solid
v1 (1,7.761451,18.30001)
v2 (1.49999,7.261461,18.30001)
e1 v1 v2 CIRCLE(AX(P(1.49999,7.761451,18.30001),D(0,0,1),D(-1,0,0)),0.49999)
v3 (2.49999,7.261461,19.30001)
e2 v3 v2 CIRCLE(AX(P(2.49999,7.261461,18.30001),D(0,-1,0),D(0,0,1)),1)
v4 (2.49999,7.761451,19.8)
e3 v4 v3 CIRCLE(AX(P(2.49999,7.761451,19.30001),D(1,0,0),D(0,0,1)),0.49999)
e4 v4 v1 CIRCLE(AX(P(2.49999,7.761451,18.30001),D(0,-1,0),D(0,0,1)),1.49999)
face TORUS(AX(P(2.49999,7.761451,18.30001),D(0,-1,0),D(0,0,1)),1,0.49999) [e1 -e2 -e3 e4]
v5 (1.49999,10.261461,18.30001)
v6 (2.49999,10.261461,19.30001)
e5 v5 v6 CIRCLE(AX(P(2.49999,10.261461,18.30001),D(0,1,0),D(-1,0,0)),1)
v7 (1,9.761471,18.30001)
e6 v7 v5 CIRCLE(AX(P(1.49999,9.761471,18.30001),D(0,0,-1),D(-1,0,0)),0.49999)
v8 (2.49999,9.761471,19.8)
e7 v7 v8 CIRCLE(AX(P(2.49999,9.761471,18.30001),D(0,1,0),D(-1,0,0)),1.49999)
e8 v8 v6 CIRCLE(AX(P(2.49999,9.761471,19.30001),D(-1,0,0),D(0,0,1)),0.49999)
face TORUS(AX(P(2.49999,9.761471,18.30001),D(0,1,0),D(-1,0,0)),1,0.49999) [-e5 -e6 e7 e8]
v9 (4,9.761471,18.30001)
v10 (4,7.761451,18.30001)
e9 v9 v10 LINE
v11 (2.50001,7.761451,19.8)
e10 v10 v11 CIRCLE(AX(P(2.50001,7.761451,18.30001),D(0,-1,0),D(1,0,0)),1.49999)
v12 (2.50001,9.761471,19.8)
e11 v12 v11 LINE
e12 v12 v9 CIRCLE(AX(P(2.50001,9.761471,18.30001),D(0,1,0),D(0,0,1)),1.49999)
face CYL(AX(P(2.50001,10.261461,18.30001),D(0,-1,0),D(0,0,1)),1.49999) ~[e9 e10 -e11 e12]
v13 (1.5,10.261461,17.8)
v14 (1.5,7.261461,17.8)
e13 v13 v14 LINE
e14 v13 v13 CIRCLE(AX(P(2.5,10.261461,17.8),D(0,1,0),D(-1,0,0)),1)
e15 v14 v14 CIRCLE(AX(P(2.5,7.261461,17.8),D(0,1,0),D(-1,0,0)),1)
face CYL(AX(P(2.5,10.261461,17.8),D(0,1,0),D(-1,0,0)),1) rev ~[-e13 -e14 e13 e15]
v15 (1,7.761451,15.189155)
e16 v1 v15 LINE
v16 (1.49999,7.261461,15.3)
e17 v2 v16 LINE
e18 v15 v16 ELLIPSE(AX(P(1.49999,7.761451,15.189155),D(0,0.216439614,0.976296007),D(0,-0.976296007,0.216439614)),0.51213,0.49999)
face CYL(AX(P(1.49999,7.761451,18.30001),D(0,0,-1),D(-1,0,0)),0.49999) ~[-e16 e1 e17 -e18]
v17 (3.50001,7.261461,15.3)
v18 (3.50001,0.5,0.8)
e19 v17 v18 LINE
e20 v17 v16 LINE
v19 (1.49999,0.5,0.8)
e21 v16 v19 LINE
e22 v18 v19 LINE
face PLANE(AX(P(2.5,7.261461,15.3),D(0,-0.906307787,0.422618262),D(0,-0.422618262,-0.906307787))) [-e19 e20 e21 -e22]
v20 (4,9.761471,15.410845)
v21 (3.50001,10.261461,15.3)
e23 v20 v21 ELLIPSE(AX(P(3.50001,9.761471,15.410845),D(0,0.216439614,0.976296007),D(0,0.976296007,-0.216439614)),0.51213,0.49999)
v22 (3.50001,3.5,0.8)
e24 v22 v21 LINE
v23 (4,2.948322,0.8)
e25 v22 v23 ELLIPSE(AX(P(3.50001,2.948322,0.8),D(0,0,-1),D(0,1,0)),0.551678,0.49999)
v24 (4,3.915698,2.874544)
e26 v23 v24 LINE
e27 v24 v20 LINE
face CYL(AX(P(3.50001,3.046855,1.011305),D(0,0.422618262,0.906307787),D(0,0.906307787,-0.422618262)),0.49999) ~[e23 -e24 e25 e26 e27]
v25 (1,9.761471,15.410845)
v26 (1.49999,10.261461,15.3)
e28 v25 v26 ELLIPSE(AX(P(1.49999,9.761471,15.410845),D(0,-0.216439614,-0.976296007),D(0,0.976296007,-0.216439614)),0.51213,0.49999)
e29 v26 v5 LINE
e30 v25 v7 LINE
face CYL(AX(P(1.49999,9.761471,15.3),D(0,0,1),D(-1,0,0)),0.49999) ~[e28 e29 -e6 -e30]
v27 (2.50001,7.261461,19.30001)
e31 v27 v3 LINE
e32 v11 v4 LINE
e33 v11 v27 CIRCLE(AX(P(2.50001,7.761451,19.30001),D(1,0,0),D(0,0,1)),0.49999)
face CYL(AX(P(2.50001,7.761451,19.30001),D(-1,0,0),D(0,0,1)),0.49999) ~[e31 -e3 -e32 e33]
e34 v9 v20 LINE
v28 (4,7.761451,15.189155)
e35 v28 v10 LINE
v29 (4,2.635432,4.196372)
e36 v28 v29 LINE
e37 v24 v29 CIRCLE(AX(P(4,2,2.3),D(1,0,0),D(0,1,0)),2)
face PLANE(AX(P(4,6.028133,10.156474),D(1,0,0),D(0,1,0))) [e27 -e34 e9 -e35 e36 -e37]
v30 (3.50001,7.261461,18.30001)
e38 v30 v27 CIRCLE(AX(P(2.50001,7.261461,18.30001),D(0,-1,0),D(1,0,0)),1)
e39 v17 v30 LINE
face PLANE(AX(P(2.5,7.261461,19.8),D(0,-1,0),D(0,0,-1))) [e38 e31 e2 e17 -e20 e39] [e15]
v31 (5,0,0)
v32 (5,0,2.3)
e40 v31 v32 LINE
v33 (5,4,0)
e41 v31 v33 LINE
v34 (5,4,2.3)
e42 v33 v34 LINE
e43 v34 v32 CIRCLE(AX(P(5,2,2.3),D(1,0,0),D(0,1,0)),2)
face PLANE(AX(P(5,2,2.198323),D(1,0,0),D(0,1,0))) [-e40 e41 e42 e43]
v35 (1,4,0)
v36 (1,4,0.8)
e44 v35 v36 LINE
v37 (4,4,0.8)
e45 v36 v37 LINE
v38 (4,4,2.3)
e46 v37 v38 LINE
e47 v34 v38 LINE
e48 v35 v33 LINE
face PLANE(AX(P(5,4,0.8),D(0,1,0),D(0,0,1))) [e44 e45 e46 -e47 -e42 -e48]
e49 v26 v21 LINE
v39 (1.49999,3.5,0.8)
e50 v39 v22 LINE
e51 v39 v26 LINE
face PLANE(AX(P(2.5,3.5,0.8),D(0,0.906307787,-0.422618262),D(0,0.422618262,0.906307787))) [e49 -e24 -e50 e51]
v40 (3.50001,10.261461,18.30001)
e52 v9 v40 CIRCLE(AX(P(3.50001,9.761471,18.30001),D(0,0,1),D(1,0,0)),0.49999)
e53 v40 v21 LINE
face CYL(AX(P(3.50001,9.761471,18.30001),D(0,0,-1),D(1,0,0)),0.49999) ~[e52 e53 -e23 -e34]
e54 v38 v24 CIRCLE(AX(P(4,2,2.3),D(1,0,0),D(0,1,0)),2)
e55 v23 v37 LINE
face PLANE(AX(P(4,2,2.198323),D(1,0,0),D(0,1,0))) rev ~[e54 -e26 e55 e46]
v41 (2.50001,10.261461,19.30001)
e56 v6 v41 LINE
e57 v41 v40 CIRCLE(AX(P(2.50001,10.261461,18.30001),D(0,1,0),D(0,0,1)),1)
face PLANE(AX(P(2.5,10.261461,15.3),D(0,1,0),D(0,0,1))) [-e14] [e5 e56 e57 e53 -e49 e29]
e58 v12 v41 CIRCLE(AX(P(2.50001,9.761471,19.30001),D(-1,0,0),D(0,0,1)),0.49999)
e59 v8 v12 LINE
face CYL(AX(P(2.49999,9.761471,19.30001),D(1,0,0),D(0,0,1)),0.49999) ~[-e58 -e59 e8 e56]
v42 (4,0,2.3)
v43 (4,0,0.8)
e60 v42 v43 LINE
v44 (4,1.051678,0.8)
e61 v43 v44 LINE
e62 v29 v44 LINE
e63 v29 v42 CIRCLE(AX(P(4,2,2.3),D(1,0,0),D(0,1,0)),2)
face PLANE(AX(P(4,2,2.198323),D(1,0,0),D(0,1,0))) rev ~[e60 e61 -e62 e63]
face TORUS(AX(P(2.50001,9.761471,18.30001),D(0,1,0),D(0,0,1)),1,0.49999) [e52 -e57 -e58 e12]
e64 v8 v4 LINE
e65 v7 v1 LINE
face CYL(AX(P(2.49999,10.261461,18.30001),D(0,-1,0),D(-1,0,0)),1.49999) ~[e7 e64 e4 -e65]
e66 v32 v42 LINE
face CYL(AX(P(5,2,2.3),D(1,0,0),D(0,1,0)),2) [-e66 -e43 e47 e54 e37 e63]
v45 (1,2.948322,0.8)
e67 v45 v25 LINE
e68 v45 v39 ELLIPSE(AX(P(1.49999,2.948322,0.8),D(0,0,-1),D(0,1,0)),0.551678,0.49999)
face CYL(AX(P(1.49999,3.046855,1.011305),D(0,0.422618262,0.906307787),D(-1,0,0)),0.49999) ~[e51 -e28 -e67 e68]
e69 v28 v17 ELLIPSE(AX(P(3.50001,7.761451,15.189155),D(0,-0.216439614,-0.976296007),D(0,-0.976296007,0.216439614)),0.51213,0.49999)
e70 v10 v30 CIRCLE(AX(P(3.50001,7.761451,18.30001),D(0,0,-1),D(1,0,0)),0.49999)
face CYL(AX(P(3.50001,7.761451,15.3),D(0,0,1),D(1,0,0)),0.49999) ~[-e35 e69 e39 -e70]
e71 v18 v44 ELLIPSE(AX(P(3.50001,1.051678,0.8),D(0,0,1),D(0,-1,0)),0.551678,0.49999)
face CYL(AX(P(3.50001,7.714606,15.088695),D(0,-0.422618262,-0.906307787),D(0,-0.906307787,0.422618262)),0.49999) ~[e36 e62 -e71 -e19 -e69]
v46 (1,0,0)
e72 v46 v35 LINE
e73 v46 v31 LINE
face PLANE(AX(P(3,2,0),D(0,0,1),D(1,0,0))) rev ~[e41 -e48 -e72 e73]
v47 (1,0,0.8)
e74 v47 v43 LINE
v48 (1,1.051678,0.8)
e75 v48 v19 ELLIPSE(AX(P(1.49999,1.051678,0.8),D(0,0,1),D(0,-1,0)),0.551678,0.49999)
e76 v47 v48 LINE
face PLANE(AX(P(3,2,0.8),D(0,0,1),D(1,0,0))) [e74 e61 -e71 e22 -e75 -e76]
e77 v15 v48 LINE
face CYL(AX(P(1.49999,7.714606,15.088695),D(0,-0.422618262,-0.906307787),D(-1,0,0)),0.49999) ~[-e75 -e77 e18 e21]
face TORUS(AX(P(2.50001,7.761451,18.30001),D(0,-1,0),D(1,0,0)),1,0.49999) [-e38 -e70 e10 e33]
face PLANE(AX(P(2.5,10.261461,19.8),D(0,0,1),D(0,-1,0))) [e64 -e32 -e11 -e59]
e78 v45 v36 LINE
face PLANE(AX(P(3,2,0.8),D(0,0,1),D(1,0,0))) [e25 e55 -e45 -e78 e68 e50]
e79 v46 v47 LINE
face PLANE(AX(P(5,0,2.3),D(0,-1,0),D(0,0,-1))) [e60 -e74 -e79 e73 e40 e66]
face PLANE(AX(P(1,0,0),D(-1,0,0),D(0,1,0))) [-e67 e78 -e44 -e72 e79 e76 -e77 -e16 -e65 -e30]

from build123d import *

# Parameters (mm, degrees)
F0_W      = 4
F0_H      = 4
F1_DEPTH  = 0.8
F4_DEPTH  = 1.5
F5_R      = 1
F6_DEPTH  = 10.2624610432
F7_R      = 1.49999
F8_R      = 0.49999
F10_DEPTH = 1


# Not quite as in the source:
# - a fillet or chamfer is up to 0.001 mm smaller than in the source, because OpenCascade refuses the exact size


with BuildPart() as f1:
    # F0 (on Top) → F1 (new body)
    with BuildSketch(Plane.XY):
        with Locations((3, 2)):
            Rectangle(F0_W, F0_H)
    extrude(amount=F1_DEPTH)

    # F3 (on offset) → F4 (join, symmetric)
    with BuildSketch(Plane.YZ.offset(2.5)):
        Polygon((0.5, 0.8), (3.5, 0.8), (10.2614610432, 15.3), (10.2614610432, 19.8), (7.2614610432, 19.8), (7.2614610432, 15.3), align=None)
    extrude(amount=F4_DEPTH, both=True)

    # F5 (on face) → F6 (cut, through all)
    with BuildSketch(Plane(origin=(0, 10.2614610432, 0), x_dir=(-1, 0, 0), z_dir=(0, 1, 0))):
        with Locations((-2.5, 17.8)):
            Circle(F5_R)
    extrude(amount=-F6_DEPTH, mode=Mode.SUBTRACT)

    # F7 (radius 1.5 in the source; OpenCascade refuses exactly that, so slightly less here)
    f7_edges = [f1.edges().sort_by_distance(p)[0] for p in [
        (1, 8.761461, 19.8),
        (4, 8.761461, 19.8),
    ]]
    fillet(f7_edges, radius=F7_R)

    # F8 (radius 0.5 in the source; OpenCascade refuses exactly that, so slightly less here)
    f8_edges = [f1.edges().sort_by_distance(p)[0] for p in [
        (1, 6.880731, 8.05),
        (1, 10.261461, 16.800005),
        (3.560663, 10.261461, 19.360663),
        (4, 6.880731, 8.05),
        (1, 3.880731, 8.05),
        (1, 7.261461, 16.800005),
        (4, 3.880731, 8.05),
    ]]
    fillet(f8_edges, radius=F8_R)

    # F9 (on face) → F10 (join)
    with BuildSketch(Plane.YZ.offset(5)):
        with BuildLine():
            Line((0, 2.3), (0, 0.8))
            Line((0, 0.8), (4, 0.8))
            Line((4, 0.8), (4, 2.3))
            ThreePointArc((4, 2.3), (2, 4.3), (0, 2.3))
        make_face()
    extrude(amount=-F10_DEPTH)


solid = f1.part
